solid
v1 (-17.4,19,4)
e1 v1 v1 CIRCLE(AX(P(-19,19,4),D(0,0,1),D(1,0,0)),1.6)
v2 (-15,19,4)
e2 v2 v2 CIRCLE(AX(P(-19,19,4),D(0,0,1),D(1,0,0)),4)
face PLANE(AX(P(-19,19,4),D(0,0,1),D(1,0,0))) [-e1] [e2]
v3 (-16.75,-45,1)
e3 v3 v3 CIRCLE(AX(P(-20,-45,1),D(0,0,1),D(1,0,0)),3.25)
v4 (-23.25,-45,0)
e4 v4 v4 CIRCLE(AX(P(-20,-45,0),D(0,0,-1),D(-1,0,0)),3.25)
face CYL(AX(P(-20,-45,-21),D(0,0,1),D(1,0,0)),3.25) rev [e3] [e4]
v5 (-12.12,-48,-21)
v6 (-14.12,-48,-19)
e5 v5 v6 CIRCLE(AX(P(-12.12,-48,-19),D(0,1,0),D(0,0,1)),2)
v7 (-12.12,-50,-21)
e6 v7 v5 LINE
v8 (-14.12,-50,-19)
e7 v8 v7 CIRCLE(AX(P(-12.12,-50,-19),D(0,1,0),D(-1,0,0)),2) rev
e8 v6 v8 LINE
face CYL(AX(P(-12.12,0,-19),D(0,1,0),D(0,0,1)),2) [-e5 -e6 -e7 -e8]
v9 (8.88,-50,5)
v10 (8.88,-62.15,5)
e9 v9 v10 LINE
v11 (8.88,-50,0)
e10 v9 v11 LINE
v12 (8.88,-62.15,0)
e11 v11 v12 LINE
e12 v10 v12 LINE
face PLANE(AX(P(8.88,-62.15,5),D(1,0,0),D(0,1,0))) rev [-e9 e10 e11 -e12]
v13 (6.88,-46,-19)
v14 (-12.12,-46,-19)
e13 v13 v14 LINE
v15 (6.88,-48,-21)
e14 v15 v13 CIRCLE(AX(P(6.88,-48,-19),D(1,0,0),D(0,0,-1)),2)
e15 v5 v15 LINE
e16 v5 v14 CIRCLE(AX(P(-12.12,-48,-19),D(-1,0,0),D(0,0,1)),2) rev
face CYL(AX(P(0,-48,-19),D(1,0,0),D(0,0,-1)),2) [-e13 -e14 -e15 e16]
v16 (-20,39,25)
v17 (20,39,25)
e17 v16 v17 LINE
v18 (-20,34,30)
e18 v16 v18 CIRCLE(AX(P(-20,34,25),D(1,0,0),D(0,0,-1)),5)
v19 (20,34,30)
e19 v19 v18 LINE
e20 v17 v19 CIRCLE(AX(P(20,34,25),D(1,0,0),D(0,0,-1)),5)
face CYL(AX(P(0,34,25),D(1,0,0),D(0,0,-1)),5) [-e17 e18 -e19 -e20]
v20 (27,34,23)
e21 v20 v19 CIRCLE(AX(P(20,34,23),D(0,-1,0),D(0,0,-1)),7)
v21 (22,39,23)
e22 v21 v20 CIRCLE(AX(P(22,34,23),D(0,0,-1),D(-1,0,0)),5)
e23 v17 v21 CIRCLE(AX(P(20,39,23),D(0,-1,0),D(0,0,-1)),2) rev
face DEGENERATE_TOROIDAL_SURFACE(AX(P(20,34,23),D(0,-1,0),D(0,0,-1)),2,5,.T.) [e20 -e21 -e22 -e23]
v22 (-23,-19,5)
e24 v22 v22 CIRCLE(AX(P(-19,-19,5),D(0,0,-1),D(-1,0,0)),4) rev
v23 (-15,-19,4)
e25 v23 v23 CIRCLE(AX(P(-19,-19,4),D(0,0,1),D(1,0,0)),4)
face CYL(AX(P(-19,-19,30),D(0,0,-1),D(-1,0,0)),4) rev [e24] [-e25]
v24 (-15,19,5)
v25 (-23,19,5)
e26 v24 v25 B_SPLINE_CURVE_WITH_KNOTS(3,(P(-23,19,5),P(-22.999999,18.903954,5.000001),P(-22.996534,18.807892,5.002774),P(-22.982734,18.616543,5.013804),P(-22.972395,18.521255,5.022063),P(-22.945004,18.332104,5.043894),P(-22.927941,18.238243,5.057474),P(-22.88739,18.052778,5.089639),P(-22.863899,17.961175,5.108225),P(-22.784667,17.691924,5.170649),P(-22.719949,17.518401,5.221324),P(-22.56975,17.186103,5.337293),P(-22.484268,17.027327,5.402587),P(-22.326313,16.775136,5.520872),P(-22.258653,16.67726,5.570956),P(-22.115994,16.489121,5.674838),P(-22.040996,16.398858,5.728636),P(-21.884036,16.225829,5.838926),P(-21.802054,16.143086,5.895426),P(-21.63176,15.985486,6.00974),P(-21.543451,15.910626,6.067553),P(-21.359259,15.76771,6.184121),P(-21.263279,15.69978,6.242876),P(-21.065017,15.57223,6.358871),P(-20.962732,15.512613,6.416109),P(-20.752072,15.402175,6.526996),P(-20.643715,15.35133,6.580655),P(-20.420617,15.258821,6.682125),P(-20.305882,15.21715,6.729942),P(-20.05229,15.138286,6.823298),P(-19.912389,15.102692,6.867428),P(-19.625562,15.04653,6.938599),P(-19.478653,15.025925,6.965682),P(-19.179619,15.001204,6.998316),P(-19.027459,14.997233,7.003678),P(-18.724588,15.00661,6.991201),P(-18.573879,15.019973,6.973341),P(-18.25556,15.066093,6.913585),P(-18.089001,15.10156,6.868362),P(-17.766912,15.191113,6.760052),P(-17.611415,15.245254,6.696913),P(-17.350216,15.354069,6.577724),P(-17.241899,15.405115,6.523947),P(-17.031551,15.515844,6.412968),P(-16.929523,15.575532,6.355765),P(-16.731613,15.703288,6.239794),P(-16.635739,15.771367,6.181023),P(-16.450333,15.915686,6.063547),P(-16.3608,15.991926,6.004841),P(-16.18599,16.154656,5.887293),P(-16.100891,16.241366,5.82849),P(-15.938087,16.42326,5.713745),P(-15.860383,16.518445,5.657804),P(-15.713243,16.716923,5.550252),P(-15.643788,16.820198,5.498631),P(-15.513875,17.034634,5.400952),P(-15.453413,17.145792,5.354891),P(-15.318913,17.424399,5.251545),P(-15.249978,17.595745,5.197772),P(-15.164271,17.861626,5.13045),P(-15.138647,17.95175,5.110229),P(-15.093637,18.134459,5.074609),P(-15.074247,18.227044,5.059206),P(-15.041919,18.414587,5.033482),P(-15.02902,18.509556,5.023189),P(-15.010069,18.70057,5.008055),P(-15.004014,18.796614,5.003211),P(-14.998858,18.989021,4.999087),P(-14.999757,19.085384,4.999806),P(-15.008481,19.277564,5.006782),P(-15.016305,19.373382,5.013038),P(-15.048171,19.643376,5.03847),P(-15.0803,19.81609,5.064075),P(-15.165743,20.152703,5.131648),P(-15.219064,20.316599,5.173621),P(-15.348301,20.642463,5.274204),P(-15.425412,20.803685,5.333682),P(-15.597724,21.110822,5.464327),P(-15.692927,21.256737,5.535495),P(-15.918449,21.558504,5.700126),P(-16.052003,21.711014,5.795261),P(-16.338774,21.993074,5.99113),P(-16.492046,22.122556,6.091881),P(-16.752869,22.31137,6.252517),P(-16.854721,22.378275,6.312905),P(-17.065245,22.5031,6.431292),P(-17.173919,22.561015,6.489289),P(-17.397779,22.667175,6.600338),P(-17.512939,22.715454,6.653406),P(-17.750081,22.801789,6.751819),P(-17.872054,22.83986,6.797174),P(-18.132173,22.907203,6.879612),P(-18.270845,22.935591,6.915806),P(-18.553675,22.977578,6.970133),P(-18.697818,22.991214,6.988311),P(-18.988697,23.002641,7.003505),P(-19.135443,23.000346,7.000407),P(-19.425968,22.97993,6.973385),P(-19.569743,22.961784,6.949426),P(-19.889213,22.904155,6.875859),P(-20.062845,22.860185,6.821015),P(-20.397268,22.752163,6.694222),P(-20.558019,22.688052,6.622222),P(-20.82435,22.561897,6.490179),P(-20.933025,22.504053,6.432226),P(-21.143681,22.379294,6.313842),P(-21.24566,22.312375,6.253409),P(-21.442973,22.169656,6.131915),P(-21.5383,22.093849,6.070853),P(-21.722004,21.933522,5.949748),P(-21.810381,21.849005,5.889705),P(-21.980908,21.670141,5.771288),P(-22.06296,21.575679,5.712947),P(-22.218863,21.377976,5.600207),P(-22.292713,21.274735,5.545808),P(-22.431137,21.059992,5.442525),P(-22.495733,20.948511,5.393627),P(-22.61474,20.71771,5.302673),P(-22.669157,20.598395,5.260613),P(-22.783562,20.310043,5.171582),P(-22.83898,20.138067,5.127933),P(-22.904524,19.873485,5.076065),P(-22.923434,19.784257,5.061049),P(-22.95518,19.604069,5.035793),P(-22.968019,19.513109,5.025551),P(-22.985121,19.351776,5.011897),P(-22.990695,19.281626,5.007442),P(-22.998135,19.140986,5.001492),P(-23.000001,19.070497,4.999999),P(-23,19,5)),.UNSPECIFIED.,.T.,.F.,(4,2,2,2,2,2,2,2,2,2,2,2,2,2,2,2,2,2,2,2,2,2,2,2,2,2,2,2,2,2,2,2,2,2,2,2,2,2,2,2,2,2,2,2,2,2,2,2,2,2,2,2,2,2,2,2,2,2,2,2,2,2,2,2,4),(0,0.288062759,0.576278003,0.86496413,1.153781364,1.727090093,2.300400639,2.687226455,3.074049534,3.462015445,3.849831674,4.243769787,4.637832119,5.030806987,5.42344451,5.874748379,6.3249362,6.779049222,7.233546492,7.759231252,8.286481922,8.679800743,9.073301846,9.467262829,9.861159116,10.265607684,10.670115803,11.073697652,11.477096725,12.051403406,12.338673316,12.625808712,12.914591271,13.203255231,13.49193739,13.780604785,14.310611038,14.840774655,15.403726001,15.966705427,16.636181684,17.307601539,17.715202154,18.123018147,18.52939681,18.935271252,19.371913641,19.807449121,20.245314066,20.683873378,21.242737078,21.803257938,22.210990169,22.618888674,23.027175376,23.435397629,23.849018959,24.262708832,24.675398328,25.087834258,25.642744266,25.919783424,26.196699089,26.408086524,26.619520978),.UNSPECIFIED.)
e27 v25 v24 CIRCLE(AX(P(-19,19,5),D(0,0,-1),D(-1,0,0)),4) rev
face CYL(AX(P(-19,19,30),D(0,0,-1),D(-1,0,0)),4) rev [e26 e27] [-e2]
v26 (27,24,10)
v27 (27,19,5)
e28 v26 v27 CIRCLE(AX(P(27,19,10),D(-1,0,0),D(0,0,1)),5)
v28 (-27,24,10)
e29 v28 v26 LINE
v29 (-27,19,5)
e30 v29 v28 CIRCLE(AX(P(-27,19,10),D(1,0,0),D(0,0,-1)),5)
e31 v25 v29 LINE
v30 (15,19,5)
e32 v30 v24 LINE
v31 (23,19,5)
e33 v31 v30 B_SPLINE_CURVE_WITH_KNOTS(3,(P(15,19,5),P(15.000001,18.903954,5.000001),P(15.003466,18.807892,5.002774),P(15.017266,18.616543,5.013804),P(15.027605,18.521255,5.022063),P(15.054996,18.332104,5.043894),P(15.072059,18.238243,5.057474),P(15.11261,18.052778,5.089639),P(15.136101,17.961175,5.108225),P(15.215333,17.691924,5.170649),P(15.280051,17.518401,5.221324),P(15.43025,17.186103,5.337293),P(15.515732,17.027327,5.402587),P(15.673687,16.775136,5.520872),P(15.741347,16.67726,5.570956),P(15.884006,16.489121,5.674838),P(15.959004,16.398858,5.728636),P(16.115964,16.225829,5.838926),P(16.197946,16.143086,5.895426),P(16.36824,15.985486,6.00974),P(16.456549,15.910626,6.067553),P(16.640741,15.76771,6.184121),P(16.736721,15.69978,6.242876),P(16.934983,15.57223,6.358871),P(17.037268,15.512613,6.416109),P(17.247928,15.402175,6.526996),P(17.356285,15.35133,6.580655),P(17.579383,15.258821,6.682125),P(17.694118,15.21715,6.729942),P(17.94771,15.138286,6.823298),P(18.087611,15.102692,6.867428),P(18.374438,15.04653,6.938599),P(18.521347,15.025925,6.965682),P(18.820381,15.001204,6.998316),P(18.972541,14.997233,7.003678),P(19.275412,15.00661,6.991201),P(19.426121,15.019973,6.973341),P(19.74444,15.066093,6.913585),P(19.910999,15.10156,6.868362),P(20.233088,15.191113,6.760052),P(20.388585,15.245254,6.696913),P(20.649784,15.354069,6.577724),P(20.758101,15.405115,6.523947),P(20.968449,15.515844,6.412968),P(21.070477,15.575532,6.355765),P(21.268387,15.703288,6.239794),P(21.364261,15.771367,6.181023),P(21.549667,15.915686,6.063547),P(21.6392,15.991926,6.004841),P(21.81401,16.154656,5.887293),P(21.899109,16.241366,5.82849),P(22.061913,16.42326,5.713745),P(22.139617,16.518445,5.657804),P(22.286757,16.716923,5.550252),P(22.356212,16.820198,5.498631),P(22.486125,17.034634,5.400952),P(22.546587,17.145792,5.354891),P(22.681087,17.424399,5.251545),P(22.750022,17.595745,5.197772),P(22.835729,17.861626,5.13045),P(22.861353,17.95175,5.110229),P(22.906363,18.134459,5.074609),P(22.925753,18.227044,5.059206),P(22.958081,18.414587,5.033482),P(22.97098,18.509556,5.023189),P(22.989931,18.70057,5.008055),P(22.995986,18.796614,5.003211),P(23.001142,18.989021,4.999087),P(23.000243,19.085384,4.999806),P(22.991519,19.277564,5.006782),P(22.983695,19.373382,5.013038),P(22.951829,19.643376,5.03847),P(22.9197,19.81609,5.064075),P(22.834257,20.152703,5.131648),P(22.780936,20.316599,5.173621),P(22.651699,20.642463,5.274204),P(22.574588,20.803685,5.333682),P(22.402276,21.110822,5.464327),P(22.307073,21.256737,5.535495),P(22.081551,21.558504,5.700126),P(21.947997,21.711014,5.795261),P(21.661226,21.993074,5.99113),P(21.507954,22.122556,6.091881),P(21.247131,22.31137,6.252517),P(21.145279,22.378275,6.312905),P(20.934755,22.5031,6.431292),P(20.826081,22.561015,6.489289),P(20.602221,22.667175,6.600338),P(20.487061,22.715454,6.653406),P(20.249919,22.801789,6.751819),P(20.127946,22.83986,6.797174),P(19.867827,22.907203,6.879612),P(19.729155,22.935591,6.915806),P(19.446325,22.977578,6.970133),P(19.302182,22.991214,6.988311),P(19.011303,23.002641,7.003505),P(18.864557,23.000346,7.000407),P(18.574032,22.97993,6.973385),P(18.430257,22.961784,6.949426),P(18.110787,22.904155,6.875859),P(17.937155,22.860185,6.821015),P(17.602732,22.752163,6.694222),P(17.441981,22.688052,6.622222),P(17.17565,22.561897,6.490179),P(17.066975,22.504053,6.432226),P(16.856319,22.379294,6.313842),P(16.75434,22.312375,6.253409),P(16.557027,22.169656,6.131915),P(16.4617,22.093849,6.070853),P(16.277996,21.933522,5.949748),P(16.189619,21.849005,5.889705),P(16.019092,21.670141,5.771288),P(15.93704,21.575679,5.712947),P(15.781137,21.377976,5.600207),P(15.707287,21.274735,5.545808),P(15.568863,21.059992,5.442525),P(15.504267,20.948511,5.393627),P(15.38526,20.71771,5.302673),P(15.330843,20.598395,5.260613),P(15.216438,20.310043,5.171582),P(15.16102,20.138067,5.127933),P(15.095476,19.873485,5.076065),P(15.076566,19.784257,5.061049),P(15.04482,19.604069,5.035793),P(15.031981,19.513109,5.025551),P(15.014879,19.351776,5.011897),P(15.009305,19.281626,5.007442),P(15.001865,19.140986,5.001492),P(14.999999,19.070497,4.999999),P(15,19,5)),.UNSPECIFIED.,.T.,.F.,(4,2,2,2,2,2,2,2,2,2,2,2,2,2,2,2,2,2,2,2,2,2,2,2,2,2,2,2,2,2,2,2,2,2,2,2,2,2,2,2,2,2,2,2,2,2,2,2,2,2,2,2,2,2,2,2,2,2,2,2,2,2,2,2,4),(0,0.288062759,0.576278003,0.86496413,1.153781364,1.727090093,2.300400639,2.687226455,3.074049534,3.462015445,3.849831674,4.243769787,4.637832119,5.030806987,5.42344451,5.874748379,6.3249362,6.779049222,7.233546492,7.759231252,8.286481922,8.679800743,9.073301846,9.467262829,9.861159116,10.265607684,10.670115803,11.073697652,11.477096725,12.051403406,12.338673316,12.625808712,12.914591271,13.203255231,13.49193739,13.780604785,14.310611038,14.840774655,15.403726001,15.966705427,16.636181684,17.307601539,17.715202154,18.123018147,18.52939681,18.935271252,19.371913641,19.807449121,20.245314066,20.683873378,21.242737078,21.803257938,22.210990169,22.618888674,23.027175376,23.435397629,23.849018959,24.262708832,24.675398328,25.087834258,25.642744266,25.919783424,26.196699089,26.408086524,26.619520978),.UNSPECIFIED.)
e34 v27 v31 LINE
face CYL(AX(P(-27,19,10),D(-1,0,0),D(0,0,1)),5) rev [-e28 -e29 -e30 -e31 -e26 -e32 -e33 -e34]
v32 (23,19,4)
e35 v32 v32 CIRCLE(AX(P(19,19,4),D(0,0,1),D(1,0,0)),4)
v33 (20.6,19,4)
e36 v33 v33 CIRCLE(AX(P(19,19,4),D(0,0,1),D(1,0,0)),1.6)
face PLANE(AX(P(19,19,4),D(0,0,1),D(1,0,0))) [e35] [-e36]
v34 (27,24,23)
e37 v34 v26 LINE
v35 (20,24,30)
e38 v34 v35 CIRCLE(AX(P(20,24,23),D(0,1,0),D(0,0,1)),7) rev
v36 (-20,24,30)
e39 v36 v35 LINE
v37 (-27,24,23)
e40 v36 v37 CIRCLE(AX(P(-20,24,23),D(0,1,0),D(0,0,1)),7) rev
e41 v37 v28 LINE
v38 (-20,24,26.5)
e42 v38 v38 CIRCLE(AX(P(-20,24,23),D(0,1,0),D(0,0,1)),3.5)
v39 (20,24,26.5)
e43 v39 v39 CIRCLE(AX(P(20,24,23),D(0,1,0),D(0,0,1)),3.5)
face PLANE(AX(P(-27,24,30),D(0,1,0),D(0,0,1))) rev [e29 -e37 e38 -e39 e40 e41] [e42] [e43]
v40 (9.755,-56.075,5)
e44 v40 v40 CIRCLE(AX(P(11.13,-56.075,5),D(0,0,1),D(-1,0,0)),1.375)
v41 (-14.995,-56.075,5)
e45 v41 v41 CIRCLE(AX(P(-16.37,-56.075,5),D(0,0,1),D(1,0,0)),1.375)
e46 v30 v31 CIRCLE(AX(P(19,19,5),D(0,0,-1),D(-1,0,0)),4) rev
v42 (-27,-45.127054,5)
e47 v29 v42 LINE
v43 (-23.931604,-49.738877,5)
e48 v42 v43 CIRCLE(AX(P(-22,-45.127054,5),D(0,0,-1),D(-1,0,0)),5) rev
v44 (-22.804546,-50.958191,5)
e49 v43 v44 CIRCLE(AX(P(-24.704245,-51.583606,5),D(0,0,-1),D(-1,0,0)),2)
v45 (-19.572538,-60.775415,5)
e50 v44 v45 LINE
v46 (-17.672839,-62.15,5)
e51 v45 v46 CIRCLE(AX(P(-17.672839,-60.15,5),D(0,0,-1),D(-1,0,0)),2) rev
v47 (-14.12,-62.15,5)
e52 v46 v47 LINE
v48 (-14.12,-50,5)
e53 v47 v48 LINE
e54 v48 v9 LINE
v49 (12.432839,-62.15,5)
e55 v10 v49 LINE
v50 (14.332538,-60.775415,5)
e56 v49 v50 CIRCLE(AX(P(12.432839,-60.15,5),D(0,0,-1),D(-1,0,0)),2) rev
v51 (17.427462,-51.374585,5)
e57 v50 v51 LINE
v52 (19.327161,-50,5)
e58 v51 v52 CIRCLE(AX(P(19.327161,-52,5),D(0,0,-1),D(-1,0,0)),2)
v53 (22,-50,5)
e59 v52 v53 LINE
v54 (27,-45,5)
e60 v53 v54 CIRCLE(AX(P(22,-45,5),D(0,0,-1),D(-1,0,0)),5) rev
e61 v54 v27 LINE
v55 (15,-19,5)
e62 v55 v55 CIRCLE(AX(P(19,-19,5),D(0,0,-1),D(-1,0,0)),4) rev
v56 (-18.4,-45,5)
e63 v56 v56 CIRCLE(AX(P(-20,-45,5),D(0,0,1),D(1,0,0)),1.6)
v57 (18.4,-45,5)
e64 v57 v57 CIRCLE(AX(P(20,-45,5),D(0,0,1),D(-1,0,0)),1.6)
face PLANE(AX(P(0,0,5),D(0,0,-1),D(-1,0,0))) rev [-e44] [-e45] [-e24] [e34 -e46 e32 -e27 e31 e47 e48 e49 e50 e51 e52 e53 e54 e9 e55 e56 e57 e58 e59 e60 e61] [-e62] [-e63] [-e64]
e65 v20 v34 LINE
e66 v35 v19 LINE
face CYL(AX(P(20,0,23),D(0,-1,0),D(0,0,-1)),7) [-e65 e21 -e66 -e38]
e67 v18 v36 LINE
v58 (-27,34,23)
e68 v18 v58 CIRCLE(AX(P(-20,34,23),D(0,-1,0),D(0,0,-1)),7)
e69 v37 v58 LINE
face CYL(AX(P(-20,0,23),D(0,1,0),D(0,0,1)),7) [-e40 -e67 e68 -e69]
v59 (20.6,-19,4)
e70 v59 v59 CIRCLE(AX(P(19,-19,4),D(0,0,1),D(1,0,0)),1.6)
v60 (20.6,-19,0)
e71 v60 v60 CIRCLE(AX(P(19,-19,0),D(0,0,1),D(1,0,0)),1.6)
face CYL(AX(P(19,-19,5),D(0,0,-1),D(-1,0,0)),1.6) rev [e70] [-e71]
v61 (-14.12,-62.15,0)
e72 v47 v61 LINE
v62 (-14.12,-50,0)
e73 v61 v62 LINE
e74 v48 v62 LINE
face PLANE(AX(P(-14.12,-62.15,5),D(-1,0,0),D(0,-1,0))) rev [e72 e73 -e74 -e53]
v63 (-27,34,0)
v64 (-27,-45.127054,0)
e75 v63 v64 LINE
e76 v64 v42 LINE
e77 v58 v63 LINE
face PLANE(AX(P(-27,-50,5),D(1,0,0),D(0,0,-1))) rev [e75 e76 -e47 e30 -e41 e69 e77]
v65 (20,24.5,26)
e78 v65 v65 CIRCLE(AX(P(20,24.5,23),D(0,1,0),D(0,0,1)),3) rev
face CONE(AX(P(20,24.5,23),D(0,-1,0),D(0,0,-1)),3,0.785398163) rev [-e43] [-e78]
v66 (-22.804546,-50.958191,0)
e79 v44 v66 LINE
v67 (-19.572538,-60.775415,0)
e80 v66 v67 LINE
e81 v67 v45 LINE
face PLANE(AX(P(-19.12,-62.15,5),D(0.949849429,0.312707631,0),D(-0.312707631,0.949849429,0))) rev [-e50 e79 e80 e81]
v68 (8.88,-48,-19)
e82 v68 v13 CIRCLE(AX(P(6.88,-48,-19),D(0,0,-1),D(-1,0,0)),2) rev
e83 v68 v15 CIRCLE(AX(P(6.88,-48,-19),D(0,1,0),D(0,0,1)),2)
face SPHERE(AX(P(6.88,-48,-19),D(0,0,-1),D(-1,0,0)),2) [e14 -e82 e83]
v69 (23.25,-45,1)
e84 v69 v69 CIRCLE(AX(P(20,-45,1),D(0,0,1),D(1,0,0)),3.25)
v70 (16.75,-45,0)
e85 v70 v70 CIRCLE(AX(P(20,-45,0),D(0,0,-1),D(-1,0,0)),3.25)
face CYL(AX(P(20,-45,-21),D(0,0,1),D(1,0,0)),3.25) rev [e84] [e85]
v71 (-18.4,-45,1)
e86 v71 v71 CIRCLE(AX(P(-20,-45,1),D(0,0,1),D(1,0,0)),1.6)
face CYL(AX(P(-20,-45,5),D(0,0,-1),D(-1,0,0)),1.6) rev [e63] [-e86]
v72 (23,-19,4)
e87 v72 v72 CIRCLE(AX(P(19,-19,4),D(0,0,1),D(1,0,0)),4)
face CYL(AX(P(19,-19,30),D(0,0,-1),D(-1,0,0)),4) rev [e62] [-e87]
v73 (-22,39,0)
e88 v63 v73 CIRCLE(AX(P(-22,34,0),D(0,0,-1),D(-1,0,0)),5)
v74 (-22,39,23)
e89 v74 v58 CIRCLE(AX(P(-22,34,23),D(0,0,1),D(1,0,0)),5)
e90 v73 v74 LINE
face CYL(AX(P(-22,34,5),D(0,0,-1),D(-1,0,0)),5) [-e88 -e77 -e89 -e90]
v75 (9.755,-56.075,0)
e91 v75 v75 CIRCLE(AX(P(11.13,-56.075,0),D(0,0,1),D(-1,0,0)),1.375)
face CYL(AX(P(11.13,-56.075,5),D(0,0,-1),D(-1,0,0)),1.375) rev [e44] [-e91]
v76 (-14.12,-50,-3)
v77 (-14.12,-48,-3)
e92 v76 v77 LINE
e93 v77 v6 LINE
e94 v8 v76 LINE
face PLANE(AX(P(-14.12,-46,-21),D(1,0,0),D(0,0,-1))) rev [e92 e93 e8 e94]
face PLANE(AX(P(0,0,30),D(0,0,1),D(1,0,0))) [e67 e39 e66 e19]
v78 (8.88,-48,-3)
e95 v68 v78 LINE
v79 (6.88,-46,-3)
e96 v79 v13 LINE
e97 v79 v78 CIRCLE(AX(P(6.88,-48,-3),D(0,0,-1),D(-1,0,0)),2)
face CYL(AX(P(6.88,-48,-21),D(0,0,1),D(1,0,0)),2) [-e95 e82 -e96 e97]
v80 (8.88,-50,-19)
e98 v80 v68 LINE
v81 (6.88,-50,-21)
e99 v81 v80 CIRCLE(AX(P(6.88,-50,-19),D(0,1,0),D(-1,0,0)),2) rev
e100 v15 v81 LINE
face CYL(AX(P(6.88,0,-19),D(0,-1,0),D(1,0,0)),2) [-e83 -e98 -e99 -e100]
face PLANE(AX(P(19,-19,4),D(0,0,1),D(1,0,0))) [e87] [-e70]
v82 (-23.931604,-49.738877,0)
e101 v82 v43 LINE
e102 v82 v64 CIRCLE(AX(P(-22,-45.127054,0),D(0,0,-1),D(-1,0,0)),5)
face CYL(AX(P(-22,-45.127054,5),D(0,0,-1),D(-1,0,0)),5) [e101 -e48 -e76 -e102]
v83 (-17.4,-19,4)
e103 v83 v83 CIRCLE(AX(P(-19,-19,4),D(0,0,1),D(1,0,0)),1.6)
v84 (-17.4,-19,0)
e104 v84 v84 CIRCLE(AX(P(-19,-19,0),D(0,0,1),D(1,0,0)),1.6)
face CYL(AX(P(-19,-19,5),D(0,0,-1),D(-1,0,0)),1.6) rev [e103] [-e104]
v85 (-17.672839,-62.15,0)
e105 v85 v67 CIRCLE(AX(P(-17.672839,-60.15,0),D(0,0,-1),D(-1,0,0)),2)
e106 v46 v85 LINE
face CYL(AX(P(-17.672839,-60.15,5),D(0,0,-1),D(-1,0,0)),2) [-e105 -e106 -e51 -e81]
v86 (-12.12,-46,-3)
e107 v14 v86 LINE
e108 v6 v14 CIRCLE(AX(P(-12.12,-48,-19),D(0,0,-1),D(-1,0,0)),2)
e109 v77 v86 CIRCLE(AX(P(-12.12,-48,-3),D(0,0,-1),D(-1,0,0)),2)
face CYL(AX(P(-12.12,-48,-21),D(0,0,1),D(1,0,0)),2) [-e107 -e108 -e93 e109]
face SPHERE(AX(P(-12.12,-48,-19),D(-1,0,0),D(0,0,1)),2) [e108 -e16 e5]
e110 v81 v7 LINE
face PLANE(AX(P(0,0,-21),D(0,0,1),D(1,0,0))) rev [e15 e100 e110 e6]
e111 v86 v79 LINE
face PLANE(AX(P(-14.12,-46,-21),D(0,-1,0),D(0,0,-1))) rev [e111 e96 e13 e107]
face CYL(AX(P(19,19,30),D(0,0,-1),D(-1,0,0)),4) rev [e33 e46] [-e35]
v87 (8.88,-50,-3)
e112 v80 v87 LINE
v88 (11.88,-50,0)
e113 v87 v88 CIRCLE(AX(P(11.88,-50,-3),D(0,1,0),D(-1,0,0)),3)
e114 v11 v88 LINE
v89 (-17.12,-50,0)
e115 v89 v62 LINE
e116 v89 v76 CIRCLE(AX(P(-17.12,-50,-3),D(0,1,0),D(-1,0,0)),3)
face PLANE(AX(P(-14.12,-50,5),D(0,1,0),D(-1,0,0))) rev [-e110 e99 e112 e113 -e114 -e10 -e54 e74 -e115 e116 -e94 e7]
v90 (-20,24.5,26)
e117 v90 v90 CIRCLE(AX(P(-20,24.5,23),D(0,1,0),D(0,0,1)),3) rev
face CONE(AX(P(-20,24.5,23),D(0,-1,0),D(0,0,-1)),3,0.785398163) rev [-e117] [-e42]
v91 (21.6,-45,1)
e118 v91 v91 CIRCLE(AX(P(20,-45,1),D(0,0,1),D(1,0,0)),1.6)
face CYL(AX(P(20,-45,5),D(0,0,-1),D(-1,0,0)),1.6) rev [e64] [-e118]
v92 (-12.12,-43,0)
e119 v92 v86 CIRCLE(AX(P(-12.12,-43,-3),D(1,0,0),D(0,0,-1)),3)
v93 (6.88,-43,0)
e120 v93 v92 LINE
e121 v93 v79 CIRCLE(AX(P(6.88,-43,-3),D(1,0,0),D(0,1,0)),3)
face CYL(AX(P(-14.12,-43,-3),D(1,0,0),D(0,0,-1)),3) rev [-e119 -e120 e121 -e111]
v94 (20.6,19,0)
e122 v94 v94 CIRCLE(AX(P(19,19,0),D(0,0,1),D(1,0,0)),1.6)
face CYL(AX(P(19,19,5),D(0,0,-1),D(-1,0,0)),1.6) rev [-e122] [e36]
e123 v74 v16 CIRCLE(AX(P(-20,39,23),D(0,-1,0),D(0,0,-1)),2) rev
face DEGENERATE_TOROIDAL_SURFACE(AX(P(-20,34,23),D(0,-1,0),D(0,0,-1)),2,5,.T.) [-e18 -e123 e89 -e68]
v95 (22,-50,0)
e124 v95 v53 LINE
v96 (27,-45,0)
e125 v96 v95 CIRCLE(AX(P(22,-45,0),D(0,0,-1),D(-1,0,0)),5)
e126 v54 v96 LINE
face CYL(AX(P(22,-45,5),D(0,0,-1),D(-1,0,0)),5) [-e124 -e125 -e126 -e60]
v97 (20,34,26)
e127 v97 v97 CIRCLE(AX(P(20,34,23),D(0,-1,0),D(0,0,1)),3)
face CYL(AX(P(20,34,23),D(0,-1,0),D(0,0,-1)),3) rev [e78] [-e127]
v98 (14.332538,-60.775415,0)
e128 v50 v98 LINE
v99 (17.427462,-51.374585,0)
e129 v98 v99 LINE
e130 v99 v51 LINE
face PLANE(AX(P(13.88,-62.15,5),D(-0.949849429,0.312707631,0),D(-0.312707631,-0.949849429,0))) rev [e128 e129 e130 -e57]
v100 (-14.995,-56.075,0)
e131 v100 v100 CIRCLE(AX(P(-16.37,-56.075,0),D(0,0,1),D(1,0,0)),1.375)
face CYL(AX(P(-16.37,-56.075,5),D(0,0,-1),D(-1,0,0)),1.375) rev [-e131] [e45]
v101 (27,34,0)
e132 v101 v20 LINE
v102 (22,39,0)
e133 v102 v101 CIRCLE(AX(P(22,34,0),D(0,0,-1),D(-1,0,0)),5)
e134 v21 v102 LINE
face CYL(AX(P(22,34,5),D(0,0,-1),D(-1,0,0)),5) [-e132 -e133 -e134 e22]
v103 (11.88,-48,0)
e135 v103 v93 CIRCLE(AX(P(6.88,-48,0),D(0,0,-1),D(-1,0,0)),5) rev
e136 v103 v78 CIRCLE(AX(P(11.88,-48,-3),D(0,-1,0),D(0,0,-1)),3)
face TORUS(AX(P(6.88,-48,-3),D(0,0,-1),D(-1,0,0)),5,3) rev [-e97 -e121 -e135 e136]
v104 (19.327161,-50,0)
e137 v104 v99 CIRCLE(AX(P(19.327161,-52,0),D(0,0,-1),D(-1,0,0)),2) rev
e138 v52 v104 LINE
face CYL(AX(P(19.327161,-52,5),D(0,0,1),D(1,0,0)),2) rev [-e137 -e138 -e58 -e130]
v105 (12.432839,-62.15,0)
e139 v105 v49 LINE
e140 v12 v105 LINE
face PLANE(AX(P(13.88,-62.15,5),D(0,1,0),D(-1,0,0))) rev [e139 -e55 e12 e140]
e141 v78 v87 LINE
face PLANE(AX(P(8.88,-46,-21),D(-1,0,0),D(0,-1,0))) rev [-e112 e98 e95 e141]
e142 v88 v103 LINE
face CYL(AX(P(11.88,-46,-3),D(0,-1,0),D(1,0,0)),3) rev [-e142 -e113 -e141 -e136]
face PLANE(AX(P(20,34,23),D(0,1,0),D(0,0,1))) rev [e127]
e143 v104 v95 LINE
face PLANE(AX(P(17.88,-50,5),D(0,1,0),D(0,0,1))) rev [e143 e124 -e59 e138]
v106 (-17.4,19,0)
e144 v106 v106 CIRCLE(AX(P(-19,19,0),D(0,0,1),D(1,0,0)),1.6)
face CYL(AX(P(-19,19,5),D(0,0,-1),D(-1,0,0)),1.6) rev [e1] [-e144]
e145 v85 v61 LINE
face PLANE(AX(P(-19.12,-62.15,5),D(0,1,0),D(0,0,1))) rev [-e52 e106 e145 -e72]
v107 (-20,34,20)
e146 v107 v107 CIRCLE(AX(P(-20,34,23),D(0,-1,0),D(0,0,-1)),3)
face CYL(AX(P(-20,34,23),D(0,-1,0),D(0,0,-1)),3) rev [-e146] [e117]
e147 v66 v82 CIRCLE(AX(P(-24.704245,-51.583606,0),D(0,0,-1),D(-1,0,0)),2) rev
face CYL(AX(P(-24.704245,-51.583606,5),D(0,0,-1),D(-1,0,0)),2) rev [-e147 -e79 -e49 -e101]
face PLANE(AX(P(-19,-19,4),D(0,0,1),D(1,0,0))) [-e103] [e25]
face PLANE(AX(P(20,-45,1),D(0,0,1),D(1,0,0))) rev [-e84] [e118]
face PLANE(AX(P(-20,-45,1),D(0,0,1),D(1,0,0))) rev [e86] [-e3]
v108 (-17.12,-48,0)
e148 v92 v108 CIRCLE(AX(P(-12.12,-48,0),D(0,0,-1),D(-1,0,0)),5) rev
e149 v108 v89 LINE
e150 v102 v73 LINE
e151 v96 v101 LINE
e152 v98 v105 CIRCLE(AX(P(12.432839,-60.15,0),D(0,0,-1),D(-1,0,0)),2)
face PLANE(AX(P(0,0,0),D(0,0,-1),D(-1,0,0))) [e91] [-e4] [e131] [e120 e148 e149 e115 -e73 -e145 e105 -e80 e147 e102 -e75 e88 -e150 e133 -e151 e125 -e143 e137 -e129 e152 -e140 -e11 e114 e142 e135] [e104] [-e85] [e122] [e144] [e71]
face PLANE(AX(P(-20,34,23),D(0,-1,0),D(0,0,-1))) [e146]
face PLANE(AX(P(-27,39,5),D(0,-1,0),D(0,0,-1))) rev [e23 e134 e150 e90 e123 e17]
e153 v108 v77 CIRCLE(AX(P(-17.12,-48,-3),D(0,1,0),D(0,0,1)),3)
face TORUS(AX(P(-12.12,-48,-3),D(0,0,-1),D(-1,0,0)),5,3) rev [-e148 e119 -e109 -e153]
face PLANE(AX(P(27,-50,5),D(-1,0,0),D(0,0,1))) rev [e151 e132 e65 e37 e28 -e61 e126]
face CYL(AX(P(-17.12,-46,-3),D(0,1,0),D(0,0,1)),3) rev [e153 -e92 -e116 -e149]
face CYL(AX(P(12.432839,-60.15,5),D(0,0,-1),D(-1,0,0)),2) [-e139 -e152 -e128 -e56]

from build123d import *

# Parameters (mm, degrees)
SKETCH_1_R               = 1.6
SKETCH_1_R_2             = 1.375
EXTRUDE_1_DEPTH          = 5
SKETCH_2_W               = 54
SKETCH_2_H               = 15
EXTRUDE_2_DEPTH          = 25
SKETCH_3_R               = 3
CUT_EXTRUDE_1_DEPTH      = 10
FILLET_1_R               = 7
FILLET_2_R               = 5
FILLET_3_R               = 5
CHAMFER_1_SIZE           = 0.5
CUT_EXTRUDE_2_DEPTH      = 73.226189886
CUT_EXTRUDE_2_DEPTH_BACK = 1
SKETCH_4_R               = 4
FILLET_4_R               = 5
SKETCH_5_W               = 23
SKETCH_5_H               = 4
EXTRUDE_3_DEPTH          = 21
FILLET_5_R               = 2
FILLET_6_R               = 3
CUT_EXTRUDE_3_DEPTH      = 1
CUT_EXTRUDE_3_DEPTH_BACK = 75.10548229
SKETCH_6_R               = 3.25


with BuildPart() as part:
    # 草图1 → 凸台-拉伸1 (new body)
    with BuildSketch(Plane.XY):
        Polygon((-27, -50), (-23.12, -50), (-19.12, -62.15), (-14.12, -62.15), (-14.12, -50), (8.88, -50), (8.88, -62.15), (13.88, -62.15), (17.88, -50), (27, -50), (27, 39), (-27, 39), align=None)
        with Locations((-19, 19)):
            Circle(SKETCH_1_R, mode=Mode.SUBTRACT)
        with Locations((19, 19)):
            Circle(SKETCH_1_R, mode=Mode.SUBTRACT)
        with Locations((19, -19)):
            Circle(SKETCH_1_R, mode=Mode.SUBTRACT)
        with Locations((-19, -19)):
            Circle(SKETCH_1_R, mode=Mode.SUBTRACT)
        with Locations((-20, -45)):
            Circle(SKETCH_1_R, mode=Mode.SUBTRACT)
        with Locations(Location((20, -45, 0), (0, 0, 180))):
            Circle(SKETCH_1_R, mode=Mode.SUBTRACT)
        with Locations((-16.37, -56.075)):
            Circle(SKETCH_1_R_2, mode=Mode.SUBTRACT)
        with Locations(Location((11.13, -56.075, 0), (0, 0, 180))):
            Circle(SKETCH_1_R_2, mode=Mode.SUBTRACT)
    extrude(amount=EXTRUDE_1_DEPTH)

    # 草图2 → 凸台-拉伸2 (add)
    with BuildSketch(Plane.XY.offset(5)):
        with Locations((0, 31.5)):
            Rectangle(SKETCH_2_W, SKETCH_2_H)
    extrude(amount=EXTRUDE_2_DEPTH)

    # 草图3 → 切除-拉伸1 (cut)
    with BuildSketch(Plane.XZ.offset(-24)):
        with Locations(Location((-20, 23, 0), (0, 0, 270))):
            Circle(SKETCH_3_R)
        with Locations(Location((20, 23, 0), (0, 0, 90))):
            Circle(SKETCH_3_R)
    extrude(amount=-CUT_EXTRUDE_1_DEPTH, mode=Mode.SUBTRACT)

    # 圆角1
    fillet_1_edges = [part.edges().sort_by_distance(p)[0] for p in [
        (-27, 31.5, 30),
        (27, 31.5, 30),
    ]]
    fillet(fillet_1_edges, radius=FILLET_1_R)

    # 圆角2
    fillet_2_edges = [part.edges().sort_by_distance(p)[0] for p in [
        (0, 39, 30),
        (-27, 39, 11.5),
        (27, 39, 11.5),
        (-24.949747468, 39, 27.949747468),
        (24.949747468, 39, 27.949747468),
    ]]
    fillet(fillet_2_edges, radius=FILLET_2_R)

    # 圆角3
    # the kernel refuses this fillet: 5 mm, written as the material it adds along each edge
    with BuildSketch(Plane(origin=(27, 24, 5), x_dir=(0, 0, 1), z_dir=(-1, 0, 0))) as fillet_3_piece_1_section:
        with BuildLine():
            CenterArc((FILLET_3_R, -FILLET_3_R), FILLET_3_R, 90, 90)
            Line((0, -FILLET_3_R), (0, 0))
            Line((0, 0), (FILLET_3_R, 0))
        make_face()
    fillet_3_piece_1 = extrude(amount=54, mode=Mode.PRIVATE)
    fillet_3_piece_1 = fillet_3_piece_1 - Plane(origin=(-19, 19, 6.136368117), x_dir=(1, 0, 0), z_dir=(0, 0, -1)) * Cylinder(1.6, 128, mode=Mode.PRIVATE)
    fillet_3_piece_1 = fillet_3_piece_1 - Plane(origin=(19, 19, 6.136368117), x_dir=(1, 0, 0), z_dir=(0, 0, -1)) * Cylinder(1.6, 128, mode=Mode.PRIVATE)
    add(fillet_3_piece_1)

    # 倒角1
    chamfer_1_edges = [part.edges().sort_by_distance(p)[0] for p in [
        (-20, 24, 26),
        (20, 24, 20),
    ]]
    chamfer(chamfer_1_edges, length=CHAMFER_1_SIZE)

    # 草图4 → 切除-拉伸2 (cut, two sides: drawn at the far end of the back side and taken through both)
    with BuildSketch(Plane.XY.offset(5).offset(-CUT_EXTRUDE_2_DEPTH_BACK)):
        with Locations((-19, 19)):
            Circle(SKETCH_4_R)
        with Locations((19, 19)):
            Circle(SKETCH_4_R)
        with Locations(Location((-19, -19, 0), (0, 0, 180))):
            Circle(SKETCH_4_R)
        with Locations(Location((19, -19, 0), (0, 0, 180))):
            Circle(SKETCH_4_R)
    extrude(amount=CUT_EXTRUDE_2_DEPTH + CUT_EXTRUDE_2_DEPTH_BACK, mode=Mode.SUBTRACT)

    # 圆角4
    # the kernel refuses this fillet: 5 mm, written as the material it takes off along each edge
    with BuildSketch(Plane(origin=(27, -50, -12.5), x_dir=(0, 1, 0), z_dir=(0, 0, 1))) as fillet_4_piece_1:
        with BuildLine():
            CenterArc((FILLET_4_R, FILLET_4_R), FILLET_4_R, 180, 90)
            Line((0, FILLET_4_R), (-FILLET_4_R * 0.02, FILLET_4_R))
            Line((-FILLET_4_R * 0.02, FILLET_4_R), (-FILLET_4_R * 0.02, -FILLET_4_R * 0.02))
            Line((-FILLET_4_R * 0.02, -FILLET_4_R * 0.02), (FILLET_4_R, -FILLET_4_R * 0.02))
            Line((FILLET_4_R, -FILLET_4_R * 0.02), (FILLET_4_R, 0))
        make_face()
    extrude(amount=30, mode=Mode.SUBTRACT)
    with BuildSketch(Plane(origin=(-27, -50, -12.182364303), x_dir=(0, 1, 0), z_dir=(0, 0, 1))) as fillet_4_piece_2:
        with BuildLine():
            CenterArc((4.872945721, -5), FILLET_4_R, 90, 77.055918457)
            Line((0, -3.88), (-0.097458914, -3.8576))
            ThreePointArc((-0.097458914, -3.8576), (-0.1, -1.94), (-0.1, 0))
            Line((-0.1, 0), (0, 0.1))
            Line((0, 0.1), (4.872945721, 0.1))
            Line((4.872945721, 0.1), (4.872945721, 0))
        make_face()
    extrude(amount=29.364728605, mode=Mode.SUBTRACT)

    # 草图5 → 凸台-拉伸3 (add)
    with BuildSketch(Plane(origin=(0, 0, 0), x_dir=(-1, 0, 0), z_dir=(0, 0, -1))):
        with Locations((2.62, -48)):
            Rectangle(SKETCH_5_W, SKETCH_5_H)
    extrude(amount=EXTRUDE_3_DEPTH)

    # 圆角5
    fillet_5_edges = [part.edges().sort_by_distance(p)[0] for p in [
        (8.88, -46, -10.5),
        (-14.12, -46, -10.5),
        (8.88, -48, -21),
        (-14.12, -48, -21),
        (-2.62, -46, -21),
        (17.88, -50, 2.5),
        (13.88, -62.15, 2.5),
        (-19.12, -62.15, 2.5),
        (-23.12, -50, 2.5),
    ]]
    fillet(fillet_5_edges, radius=FILLET_5_R)

    # 圆角6
    fillet_6_edges = [part.edges().sort_by_distance(p)[0] for p in [
        (-14.12, -49, 0),
        (8.88, -49, 0),
        (-2.62, -46, 0),
        (8.294213562, -46.585786438, 0),
        (-13.534213562, -46.585786438, 0),
    ]]
    fillet(fillet_6_edges, radius=FILLET_6_R)

    # 草图6 → 切除-拉伸3 (cut, two sides: drawn at the far end of the back side and taken through both)
    with BuildSketch(Plane.XY.offset(-CUT_EXTRUDE_3_DEPTH_BACK)):
        with Locations((-20, -45)):
            Circle(SKETCH_6_R)
        with Locations((20, -45)):
            Circle(SKETCH_6_R)
    extrude(amount=CUT_EXTRUDE_3_DEPTH + CUT_EXTRUDE_3_DEPTH_BACK, mode=Mode.SUBTRACT)


solid = part.part
